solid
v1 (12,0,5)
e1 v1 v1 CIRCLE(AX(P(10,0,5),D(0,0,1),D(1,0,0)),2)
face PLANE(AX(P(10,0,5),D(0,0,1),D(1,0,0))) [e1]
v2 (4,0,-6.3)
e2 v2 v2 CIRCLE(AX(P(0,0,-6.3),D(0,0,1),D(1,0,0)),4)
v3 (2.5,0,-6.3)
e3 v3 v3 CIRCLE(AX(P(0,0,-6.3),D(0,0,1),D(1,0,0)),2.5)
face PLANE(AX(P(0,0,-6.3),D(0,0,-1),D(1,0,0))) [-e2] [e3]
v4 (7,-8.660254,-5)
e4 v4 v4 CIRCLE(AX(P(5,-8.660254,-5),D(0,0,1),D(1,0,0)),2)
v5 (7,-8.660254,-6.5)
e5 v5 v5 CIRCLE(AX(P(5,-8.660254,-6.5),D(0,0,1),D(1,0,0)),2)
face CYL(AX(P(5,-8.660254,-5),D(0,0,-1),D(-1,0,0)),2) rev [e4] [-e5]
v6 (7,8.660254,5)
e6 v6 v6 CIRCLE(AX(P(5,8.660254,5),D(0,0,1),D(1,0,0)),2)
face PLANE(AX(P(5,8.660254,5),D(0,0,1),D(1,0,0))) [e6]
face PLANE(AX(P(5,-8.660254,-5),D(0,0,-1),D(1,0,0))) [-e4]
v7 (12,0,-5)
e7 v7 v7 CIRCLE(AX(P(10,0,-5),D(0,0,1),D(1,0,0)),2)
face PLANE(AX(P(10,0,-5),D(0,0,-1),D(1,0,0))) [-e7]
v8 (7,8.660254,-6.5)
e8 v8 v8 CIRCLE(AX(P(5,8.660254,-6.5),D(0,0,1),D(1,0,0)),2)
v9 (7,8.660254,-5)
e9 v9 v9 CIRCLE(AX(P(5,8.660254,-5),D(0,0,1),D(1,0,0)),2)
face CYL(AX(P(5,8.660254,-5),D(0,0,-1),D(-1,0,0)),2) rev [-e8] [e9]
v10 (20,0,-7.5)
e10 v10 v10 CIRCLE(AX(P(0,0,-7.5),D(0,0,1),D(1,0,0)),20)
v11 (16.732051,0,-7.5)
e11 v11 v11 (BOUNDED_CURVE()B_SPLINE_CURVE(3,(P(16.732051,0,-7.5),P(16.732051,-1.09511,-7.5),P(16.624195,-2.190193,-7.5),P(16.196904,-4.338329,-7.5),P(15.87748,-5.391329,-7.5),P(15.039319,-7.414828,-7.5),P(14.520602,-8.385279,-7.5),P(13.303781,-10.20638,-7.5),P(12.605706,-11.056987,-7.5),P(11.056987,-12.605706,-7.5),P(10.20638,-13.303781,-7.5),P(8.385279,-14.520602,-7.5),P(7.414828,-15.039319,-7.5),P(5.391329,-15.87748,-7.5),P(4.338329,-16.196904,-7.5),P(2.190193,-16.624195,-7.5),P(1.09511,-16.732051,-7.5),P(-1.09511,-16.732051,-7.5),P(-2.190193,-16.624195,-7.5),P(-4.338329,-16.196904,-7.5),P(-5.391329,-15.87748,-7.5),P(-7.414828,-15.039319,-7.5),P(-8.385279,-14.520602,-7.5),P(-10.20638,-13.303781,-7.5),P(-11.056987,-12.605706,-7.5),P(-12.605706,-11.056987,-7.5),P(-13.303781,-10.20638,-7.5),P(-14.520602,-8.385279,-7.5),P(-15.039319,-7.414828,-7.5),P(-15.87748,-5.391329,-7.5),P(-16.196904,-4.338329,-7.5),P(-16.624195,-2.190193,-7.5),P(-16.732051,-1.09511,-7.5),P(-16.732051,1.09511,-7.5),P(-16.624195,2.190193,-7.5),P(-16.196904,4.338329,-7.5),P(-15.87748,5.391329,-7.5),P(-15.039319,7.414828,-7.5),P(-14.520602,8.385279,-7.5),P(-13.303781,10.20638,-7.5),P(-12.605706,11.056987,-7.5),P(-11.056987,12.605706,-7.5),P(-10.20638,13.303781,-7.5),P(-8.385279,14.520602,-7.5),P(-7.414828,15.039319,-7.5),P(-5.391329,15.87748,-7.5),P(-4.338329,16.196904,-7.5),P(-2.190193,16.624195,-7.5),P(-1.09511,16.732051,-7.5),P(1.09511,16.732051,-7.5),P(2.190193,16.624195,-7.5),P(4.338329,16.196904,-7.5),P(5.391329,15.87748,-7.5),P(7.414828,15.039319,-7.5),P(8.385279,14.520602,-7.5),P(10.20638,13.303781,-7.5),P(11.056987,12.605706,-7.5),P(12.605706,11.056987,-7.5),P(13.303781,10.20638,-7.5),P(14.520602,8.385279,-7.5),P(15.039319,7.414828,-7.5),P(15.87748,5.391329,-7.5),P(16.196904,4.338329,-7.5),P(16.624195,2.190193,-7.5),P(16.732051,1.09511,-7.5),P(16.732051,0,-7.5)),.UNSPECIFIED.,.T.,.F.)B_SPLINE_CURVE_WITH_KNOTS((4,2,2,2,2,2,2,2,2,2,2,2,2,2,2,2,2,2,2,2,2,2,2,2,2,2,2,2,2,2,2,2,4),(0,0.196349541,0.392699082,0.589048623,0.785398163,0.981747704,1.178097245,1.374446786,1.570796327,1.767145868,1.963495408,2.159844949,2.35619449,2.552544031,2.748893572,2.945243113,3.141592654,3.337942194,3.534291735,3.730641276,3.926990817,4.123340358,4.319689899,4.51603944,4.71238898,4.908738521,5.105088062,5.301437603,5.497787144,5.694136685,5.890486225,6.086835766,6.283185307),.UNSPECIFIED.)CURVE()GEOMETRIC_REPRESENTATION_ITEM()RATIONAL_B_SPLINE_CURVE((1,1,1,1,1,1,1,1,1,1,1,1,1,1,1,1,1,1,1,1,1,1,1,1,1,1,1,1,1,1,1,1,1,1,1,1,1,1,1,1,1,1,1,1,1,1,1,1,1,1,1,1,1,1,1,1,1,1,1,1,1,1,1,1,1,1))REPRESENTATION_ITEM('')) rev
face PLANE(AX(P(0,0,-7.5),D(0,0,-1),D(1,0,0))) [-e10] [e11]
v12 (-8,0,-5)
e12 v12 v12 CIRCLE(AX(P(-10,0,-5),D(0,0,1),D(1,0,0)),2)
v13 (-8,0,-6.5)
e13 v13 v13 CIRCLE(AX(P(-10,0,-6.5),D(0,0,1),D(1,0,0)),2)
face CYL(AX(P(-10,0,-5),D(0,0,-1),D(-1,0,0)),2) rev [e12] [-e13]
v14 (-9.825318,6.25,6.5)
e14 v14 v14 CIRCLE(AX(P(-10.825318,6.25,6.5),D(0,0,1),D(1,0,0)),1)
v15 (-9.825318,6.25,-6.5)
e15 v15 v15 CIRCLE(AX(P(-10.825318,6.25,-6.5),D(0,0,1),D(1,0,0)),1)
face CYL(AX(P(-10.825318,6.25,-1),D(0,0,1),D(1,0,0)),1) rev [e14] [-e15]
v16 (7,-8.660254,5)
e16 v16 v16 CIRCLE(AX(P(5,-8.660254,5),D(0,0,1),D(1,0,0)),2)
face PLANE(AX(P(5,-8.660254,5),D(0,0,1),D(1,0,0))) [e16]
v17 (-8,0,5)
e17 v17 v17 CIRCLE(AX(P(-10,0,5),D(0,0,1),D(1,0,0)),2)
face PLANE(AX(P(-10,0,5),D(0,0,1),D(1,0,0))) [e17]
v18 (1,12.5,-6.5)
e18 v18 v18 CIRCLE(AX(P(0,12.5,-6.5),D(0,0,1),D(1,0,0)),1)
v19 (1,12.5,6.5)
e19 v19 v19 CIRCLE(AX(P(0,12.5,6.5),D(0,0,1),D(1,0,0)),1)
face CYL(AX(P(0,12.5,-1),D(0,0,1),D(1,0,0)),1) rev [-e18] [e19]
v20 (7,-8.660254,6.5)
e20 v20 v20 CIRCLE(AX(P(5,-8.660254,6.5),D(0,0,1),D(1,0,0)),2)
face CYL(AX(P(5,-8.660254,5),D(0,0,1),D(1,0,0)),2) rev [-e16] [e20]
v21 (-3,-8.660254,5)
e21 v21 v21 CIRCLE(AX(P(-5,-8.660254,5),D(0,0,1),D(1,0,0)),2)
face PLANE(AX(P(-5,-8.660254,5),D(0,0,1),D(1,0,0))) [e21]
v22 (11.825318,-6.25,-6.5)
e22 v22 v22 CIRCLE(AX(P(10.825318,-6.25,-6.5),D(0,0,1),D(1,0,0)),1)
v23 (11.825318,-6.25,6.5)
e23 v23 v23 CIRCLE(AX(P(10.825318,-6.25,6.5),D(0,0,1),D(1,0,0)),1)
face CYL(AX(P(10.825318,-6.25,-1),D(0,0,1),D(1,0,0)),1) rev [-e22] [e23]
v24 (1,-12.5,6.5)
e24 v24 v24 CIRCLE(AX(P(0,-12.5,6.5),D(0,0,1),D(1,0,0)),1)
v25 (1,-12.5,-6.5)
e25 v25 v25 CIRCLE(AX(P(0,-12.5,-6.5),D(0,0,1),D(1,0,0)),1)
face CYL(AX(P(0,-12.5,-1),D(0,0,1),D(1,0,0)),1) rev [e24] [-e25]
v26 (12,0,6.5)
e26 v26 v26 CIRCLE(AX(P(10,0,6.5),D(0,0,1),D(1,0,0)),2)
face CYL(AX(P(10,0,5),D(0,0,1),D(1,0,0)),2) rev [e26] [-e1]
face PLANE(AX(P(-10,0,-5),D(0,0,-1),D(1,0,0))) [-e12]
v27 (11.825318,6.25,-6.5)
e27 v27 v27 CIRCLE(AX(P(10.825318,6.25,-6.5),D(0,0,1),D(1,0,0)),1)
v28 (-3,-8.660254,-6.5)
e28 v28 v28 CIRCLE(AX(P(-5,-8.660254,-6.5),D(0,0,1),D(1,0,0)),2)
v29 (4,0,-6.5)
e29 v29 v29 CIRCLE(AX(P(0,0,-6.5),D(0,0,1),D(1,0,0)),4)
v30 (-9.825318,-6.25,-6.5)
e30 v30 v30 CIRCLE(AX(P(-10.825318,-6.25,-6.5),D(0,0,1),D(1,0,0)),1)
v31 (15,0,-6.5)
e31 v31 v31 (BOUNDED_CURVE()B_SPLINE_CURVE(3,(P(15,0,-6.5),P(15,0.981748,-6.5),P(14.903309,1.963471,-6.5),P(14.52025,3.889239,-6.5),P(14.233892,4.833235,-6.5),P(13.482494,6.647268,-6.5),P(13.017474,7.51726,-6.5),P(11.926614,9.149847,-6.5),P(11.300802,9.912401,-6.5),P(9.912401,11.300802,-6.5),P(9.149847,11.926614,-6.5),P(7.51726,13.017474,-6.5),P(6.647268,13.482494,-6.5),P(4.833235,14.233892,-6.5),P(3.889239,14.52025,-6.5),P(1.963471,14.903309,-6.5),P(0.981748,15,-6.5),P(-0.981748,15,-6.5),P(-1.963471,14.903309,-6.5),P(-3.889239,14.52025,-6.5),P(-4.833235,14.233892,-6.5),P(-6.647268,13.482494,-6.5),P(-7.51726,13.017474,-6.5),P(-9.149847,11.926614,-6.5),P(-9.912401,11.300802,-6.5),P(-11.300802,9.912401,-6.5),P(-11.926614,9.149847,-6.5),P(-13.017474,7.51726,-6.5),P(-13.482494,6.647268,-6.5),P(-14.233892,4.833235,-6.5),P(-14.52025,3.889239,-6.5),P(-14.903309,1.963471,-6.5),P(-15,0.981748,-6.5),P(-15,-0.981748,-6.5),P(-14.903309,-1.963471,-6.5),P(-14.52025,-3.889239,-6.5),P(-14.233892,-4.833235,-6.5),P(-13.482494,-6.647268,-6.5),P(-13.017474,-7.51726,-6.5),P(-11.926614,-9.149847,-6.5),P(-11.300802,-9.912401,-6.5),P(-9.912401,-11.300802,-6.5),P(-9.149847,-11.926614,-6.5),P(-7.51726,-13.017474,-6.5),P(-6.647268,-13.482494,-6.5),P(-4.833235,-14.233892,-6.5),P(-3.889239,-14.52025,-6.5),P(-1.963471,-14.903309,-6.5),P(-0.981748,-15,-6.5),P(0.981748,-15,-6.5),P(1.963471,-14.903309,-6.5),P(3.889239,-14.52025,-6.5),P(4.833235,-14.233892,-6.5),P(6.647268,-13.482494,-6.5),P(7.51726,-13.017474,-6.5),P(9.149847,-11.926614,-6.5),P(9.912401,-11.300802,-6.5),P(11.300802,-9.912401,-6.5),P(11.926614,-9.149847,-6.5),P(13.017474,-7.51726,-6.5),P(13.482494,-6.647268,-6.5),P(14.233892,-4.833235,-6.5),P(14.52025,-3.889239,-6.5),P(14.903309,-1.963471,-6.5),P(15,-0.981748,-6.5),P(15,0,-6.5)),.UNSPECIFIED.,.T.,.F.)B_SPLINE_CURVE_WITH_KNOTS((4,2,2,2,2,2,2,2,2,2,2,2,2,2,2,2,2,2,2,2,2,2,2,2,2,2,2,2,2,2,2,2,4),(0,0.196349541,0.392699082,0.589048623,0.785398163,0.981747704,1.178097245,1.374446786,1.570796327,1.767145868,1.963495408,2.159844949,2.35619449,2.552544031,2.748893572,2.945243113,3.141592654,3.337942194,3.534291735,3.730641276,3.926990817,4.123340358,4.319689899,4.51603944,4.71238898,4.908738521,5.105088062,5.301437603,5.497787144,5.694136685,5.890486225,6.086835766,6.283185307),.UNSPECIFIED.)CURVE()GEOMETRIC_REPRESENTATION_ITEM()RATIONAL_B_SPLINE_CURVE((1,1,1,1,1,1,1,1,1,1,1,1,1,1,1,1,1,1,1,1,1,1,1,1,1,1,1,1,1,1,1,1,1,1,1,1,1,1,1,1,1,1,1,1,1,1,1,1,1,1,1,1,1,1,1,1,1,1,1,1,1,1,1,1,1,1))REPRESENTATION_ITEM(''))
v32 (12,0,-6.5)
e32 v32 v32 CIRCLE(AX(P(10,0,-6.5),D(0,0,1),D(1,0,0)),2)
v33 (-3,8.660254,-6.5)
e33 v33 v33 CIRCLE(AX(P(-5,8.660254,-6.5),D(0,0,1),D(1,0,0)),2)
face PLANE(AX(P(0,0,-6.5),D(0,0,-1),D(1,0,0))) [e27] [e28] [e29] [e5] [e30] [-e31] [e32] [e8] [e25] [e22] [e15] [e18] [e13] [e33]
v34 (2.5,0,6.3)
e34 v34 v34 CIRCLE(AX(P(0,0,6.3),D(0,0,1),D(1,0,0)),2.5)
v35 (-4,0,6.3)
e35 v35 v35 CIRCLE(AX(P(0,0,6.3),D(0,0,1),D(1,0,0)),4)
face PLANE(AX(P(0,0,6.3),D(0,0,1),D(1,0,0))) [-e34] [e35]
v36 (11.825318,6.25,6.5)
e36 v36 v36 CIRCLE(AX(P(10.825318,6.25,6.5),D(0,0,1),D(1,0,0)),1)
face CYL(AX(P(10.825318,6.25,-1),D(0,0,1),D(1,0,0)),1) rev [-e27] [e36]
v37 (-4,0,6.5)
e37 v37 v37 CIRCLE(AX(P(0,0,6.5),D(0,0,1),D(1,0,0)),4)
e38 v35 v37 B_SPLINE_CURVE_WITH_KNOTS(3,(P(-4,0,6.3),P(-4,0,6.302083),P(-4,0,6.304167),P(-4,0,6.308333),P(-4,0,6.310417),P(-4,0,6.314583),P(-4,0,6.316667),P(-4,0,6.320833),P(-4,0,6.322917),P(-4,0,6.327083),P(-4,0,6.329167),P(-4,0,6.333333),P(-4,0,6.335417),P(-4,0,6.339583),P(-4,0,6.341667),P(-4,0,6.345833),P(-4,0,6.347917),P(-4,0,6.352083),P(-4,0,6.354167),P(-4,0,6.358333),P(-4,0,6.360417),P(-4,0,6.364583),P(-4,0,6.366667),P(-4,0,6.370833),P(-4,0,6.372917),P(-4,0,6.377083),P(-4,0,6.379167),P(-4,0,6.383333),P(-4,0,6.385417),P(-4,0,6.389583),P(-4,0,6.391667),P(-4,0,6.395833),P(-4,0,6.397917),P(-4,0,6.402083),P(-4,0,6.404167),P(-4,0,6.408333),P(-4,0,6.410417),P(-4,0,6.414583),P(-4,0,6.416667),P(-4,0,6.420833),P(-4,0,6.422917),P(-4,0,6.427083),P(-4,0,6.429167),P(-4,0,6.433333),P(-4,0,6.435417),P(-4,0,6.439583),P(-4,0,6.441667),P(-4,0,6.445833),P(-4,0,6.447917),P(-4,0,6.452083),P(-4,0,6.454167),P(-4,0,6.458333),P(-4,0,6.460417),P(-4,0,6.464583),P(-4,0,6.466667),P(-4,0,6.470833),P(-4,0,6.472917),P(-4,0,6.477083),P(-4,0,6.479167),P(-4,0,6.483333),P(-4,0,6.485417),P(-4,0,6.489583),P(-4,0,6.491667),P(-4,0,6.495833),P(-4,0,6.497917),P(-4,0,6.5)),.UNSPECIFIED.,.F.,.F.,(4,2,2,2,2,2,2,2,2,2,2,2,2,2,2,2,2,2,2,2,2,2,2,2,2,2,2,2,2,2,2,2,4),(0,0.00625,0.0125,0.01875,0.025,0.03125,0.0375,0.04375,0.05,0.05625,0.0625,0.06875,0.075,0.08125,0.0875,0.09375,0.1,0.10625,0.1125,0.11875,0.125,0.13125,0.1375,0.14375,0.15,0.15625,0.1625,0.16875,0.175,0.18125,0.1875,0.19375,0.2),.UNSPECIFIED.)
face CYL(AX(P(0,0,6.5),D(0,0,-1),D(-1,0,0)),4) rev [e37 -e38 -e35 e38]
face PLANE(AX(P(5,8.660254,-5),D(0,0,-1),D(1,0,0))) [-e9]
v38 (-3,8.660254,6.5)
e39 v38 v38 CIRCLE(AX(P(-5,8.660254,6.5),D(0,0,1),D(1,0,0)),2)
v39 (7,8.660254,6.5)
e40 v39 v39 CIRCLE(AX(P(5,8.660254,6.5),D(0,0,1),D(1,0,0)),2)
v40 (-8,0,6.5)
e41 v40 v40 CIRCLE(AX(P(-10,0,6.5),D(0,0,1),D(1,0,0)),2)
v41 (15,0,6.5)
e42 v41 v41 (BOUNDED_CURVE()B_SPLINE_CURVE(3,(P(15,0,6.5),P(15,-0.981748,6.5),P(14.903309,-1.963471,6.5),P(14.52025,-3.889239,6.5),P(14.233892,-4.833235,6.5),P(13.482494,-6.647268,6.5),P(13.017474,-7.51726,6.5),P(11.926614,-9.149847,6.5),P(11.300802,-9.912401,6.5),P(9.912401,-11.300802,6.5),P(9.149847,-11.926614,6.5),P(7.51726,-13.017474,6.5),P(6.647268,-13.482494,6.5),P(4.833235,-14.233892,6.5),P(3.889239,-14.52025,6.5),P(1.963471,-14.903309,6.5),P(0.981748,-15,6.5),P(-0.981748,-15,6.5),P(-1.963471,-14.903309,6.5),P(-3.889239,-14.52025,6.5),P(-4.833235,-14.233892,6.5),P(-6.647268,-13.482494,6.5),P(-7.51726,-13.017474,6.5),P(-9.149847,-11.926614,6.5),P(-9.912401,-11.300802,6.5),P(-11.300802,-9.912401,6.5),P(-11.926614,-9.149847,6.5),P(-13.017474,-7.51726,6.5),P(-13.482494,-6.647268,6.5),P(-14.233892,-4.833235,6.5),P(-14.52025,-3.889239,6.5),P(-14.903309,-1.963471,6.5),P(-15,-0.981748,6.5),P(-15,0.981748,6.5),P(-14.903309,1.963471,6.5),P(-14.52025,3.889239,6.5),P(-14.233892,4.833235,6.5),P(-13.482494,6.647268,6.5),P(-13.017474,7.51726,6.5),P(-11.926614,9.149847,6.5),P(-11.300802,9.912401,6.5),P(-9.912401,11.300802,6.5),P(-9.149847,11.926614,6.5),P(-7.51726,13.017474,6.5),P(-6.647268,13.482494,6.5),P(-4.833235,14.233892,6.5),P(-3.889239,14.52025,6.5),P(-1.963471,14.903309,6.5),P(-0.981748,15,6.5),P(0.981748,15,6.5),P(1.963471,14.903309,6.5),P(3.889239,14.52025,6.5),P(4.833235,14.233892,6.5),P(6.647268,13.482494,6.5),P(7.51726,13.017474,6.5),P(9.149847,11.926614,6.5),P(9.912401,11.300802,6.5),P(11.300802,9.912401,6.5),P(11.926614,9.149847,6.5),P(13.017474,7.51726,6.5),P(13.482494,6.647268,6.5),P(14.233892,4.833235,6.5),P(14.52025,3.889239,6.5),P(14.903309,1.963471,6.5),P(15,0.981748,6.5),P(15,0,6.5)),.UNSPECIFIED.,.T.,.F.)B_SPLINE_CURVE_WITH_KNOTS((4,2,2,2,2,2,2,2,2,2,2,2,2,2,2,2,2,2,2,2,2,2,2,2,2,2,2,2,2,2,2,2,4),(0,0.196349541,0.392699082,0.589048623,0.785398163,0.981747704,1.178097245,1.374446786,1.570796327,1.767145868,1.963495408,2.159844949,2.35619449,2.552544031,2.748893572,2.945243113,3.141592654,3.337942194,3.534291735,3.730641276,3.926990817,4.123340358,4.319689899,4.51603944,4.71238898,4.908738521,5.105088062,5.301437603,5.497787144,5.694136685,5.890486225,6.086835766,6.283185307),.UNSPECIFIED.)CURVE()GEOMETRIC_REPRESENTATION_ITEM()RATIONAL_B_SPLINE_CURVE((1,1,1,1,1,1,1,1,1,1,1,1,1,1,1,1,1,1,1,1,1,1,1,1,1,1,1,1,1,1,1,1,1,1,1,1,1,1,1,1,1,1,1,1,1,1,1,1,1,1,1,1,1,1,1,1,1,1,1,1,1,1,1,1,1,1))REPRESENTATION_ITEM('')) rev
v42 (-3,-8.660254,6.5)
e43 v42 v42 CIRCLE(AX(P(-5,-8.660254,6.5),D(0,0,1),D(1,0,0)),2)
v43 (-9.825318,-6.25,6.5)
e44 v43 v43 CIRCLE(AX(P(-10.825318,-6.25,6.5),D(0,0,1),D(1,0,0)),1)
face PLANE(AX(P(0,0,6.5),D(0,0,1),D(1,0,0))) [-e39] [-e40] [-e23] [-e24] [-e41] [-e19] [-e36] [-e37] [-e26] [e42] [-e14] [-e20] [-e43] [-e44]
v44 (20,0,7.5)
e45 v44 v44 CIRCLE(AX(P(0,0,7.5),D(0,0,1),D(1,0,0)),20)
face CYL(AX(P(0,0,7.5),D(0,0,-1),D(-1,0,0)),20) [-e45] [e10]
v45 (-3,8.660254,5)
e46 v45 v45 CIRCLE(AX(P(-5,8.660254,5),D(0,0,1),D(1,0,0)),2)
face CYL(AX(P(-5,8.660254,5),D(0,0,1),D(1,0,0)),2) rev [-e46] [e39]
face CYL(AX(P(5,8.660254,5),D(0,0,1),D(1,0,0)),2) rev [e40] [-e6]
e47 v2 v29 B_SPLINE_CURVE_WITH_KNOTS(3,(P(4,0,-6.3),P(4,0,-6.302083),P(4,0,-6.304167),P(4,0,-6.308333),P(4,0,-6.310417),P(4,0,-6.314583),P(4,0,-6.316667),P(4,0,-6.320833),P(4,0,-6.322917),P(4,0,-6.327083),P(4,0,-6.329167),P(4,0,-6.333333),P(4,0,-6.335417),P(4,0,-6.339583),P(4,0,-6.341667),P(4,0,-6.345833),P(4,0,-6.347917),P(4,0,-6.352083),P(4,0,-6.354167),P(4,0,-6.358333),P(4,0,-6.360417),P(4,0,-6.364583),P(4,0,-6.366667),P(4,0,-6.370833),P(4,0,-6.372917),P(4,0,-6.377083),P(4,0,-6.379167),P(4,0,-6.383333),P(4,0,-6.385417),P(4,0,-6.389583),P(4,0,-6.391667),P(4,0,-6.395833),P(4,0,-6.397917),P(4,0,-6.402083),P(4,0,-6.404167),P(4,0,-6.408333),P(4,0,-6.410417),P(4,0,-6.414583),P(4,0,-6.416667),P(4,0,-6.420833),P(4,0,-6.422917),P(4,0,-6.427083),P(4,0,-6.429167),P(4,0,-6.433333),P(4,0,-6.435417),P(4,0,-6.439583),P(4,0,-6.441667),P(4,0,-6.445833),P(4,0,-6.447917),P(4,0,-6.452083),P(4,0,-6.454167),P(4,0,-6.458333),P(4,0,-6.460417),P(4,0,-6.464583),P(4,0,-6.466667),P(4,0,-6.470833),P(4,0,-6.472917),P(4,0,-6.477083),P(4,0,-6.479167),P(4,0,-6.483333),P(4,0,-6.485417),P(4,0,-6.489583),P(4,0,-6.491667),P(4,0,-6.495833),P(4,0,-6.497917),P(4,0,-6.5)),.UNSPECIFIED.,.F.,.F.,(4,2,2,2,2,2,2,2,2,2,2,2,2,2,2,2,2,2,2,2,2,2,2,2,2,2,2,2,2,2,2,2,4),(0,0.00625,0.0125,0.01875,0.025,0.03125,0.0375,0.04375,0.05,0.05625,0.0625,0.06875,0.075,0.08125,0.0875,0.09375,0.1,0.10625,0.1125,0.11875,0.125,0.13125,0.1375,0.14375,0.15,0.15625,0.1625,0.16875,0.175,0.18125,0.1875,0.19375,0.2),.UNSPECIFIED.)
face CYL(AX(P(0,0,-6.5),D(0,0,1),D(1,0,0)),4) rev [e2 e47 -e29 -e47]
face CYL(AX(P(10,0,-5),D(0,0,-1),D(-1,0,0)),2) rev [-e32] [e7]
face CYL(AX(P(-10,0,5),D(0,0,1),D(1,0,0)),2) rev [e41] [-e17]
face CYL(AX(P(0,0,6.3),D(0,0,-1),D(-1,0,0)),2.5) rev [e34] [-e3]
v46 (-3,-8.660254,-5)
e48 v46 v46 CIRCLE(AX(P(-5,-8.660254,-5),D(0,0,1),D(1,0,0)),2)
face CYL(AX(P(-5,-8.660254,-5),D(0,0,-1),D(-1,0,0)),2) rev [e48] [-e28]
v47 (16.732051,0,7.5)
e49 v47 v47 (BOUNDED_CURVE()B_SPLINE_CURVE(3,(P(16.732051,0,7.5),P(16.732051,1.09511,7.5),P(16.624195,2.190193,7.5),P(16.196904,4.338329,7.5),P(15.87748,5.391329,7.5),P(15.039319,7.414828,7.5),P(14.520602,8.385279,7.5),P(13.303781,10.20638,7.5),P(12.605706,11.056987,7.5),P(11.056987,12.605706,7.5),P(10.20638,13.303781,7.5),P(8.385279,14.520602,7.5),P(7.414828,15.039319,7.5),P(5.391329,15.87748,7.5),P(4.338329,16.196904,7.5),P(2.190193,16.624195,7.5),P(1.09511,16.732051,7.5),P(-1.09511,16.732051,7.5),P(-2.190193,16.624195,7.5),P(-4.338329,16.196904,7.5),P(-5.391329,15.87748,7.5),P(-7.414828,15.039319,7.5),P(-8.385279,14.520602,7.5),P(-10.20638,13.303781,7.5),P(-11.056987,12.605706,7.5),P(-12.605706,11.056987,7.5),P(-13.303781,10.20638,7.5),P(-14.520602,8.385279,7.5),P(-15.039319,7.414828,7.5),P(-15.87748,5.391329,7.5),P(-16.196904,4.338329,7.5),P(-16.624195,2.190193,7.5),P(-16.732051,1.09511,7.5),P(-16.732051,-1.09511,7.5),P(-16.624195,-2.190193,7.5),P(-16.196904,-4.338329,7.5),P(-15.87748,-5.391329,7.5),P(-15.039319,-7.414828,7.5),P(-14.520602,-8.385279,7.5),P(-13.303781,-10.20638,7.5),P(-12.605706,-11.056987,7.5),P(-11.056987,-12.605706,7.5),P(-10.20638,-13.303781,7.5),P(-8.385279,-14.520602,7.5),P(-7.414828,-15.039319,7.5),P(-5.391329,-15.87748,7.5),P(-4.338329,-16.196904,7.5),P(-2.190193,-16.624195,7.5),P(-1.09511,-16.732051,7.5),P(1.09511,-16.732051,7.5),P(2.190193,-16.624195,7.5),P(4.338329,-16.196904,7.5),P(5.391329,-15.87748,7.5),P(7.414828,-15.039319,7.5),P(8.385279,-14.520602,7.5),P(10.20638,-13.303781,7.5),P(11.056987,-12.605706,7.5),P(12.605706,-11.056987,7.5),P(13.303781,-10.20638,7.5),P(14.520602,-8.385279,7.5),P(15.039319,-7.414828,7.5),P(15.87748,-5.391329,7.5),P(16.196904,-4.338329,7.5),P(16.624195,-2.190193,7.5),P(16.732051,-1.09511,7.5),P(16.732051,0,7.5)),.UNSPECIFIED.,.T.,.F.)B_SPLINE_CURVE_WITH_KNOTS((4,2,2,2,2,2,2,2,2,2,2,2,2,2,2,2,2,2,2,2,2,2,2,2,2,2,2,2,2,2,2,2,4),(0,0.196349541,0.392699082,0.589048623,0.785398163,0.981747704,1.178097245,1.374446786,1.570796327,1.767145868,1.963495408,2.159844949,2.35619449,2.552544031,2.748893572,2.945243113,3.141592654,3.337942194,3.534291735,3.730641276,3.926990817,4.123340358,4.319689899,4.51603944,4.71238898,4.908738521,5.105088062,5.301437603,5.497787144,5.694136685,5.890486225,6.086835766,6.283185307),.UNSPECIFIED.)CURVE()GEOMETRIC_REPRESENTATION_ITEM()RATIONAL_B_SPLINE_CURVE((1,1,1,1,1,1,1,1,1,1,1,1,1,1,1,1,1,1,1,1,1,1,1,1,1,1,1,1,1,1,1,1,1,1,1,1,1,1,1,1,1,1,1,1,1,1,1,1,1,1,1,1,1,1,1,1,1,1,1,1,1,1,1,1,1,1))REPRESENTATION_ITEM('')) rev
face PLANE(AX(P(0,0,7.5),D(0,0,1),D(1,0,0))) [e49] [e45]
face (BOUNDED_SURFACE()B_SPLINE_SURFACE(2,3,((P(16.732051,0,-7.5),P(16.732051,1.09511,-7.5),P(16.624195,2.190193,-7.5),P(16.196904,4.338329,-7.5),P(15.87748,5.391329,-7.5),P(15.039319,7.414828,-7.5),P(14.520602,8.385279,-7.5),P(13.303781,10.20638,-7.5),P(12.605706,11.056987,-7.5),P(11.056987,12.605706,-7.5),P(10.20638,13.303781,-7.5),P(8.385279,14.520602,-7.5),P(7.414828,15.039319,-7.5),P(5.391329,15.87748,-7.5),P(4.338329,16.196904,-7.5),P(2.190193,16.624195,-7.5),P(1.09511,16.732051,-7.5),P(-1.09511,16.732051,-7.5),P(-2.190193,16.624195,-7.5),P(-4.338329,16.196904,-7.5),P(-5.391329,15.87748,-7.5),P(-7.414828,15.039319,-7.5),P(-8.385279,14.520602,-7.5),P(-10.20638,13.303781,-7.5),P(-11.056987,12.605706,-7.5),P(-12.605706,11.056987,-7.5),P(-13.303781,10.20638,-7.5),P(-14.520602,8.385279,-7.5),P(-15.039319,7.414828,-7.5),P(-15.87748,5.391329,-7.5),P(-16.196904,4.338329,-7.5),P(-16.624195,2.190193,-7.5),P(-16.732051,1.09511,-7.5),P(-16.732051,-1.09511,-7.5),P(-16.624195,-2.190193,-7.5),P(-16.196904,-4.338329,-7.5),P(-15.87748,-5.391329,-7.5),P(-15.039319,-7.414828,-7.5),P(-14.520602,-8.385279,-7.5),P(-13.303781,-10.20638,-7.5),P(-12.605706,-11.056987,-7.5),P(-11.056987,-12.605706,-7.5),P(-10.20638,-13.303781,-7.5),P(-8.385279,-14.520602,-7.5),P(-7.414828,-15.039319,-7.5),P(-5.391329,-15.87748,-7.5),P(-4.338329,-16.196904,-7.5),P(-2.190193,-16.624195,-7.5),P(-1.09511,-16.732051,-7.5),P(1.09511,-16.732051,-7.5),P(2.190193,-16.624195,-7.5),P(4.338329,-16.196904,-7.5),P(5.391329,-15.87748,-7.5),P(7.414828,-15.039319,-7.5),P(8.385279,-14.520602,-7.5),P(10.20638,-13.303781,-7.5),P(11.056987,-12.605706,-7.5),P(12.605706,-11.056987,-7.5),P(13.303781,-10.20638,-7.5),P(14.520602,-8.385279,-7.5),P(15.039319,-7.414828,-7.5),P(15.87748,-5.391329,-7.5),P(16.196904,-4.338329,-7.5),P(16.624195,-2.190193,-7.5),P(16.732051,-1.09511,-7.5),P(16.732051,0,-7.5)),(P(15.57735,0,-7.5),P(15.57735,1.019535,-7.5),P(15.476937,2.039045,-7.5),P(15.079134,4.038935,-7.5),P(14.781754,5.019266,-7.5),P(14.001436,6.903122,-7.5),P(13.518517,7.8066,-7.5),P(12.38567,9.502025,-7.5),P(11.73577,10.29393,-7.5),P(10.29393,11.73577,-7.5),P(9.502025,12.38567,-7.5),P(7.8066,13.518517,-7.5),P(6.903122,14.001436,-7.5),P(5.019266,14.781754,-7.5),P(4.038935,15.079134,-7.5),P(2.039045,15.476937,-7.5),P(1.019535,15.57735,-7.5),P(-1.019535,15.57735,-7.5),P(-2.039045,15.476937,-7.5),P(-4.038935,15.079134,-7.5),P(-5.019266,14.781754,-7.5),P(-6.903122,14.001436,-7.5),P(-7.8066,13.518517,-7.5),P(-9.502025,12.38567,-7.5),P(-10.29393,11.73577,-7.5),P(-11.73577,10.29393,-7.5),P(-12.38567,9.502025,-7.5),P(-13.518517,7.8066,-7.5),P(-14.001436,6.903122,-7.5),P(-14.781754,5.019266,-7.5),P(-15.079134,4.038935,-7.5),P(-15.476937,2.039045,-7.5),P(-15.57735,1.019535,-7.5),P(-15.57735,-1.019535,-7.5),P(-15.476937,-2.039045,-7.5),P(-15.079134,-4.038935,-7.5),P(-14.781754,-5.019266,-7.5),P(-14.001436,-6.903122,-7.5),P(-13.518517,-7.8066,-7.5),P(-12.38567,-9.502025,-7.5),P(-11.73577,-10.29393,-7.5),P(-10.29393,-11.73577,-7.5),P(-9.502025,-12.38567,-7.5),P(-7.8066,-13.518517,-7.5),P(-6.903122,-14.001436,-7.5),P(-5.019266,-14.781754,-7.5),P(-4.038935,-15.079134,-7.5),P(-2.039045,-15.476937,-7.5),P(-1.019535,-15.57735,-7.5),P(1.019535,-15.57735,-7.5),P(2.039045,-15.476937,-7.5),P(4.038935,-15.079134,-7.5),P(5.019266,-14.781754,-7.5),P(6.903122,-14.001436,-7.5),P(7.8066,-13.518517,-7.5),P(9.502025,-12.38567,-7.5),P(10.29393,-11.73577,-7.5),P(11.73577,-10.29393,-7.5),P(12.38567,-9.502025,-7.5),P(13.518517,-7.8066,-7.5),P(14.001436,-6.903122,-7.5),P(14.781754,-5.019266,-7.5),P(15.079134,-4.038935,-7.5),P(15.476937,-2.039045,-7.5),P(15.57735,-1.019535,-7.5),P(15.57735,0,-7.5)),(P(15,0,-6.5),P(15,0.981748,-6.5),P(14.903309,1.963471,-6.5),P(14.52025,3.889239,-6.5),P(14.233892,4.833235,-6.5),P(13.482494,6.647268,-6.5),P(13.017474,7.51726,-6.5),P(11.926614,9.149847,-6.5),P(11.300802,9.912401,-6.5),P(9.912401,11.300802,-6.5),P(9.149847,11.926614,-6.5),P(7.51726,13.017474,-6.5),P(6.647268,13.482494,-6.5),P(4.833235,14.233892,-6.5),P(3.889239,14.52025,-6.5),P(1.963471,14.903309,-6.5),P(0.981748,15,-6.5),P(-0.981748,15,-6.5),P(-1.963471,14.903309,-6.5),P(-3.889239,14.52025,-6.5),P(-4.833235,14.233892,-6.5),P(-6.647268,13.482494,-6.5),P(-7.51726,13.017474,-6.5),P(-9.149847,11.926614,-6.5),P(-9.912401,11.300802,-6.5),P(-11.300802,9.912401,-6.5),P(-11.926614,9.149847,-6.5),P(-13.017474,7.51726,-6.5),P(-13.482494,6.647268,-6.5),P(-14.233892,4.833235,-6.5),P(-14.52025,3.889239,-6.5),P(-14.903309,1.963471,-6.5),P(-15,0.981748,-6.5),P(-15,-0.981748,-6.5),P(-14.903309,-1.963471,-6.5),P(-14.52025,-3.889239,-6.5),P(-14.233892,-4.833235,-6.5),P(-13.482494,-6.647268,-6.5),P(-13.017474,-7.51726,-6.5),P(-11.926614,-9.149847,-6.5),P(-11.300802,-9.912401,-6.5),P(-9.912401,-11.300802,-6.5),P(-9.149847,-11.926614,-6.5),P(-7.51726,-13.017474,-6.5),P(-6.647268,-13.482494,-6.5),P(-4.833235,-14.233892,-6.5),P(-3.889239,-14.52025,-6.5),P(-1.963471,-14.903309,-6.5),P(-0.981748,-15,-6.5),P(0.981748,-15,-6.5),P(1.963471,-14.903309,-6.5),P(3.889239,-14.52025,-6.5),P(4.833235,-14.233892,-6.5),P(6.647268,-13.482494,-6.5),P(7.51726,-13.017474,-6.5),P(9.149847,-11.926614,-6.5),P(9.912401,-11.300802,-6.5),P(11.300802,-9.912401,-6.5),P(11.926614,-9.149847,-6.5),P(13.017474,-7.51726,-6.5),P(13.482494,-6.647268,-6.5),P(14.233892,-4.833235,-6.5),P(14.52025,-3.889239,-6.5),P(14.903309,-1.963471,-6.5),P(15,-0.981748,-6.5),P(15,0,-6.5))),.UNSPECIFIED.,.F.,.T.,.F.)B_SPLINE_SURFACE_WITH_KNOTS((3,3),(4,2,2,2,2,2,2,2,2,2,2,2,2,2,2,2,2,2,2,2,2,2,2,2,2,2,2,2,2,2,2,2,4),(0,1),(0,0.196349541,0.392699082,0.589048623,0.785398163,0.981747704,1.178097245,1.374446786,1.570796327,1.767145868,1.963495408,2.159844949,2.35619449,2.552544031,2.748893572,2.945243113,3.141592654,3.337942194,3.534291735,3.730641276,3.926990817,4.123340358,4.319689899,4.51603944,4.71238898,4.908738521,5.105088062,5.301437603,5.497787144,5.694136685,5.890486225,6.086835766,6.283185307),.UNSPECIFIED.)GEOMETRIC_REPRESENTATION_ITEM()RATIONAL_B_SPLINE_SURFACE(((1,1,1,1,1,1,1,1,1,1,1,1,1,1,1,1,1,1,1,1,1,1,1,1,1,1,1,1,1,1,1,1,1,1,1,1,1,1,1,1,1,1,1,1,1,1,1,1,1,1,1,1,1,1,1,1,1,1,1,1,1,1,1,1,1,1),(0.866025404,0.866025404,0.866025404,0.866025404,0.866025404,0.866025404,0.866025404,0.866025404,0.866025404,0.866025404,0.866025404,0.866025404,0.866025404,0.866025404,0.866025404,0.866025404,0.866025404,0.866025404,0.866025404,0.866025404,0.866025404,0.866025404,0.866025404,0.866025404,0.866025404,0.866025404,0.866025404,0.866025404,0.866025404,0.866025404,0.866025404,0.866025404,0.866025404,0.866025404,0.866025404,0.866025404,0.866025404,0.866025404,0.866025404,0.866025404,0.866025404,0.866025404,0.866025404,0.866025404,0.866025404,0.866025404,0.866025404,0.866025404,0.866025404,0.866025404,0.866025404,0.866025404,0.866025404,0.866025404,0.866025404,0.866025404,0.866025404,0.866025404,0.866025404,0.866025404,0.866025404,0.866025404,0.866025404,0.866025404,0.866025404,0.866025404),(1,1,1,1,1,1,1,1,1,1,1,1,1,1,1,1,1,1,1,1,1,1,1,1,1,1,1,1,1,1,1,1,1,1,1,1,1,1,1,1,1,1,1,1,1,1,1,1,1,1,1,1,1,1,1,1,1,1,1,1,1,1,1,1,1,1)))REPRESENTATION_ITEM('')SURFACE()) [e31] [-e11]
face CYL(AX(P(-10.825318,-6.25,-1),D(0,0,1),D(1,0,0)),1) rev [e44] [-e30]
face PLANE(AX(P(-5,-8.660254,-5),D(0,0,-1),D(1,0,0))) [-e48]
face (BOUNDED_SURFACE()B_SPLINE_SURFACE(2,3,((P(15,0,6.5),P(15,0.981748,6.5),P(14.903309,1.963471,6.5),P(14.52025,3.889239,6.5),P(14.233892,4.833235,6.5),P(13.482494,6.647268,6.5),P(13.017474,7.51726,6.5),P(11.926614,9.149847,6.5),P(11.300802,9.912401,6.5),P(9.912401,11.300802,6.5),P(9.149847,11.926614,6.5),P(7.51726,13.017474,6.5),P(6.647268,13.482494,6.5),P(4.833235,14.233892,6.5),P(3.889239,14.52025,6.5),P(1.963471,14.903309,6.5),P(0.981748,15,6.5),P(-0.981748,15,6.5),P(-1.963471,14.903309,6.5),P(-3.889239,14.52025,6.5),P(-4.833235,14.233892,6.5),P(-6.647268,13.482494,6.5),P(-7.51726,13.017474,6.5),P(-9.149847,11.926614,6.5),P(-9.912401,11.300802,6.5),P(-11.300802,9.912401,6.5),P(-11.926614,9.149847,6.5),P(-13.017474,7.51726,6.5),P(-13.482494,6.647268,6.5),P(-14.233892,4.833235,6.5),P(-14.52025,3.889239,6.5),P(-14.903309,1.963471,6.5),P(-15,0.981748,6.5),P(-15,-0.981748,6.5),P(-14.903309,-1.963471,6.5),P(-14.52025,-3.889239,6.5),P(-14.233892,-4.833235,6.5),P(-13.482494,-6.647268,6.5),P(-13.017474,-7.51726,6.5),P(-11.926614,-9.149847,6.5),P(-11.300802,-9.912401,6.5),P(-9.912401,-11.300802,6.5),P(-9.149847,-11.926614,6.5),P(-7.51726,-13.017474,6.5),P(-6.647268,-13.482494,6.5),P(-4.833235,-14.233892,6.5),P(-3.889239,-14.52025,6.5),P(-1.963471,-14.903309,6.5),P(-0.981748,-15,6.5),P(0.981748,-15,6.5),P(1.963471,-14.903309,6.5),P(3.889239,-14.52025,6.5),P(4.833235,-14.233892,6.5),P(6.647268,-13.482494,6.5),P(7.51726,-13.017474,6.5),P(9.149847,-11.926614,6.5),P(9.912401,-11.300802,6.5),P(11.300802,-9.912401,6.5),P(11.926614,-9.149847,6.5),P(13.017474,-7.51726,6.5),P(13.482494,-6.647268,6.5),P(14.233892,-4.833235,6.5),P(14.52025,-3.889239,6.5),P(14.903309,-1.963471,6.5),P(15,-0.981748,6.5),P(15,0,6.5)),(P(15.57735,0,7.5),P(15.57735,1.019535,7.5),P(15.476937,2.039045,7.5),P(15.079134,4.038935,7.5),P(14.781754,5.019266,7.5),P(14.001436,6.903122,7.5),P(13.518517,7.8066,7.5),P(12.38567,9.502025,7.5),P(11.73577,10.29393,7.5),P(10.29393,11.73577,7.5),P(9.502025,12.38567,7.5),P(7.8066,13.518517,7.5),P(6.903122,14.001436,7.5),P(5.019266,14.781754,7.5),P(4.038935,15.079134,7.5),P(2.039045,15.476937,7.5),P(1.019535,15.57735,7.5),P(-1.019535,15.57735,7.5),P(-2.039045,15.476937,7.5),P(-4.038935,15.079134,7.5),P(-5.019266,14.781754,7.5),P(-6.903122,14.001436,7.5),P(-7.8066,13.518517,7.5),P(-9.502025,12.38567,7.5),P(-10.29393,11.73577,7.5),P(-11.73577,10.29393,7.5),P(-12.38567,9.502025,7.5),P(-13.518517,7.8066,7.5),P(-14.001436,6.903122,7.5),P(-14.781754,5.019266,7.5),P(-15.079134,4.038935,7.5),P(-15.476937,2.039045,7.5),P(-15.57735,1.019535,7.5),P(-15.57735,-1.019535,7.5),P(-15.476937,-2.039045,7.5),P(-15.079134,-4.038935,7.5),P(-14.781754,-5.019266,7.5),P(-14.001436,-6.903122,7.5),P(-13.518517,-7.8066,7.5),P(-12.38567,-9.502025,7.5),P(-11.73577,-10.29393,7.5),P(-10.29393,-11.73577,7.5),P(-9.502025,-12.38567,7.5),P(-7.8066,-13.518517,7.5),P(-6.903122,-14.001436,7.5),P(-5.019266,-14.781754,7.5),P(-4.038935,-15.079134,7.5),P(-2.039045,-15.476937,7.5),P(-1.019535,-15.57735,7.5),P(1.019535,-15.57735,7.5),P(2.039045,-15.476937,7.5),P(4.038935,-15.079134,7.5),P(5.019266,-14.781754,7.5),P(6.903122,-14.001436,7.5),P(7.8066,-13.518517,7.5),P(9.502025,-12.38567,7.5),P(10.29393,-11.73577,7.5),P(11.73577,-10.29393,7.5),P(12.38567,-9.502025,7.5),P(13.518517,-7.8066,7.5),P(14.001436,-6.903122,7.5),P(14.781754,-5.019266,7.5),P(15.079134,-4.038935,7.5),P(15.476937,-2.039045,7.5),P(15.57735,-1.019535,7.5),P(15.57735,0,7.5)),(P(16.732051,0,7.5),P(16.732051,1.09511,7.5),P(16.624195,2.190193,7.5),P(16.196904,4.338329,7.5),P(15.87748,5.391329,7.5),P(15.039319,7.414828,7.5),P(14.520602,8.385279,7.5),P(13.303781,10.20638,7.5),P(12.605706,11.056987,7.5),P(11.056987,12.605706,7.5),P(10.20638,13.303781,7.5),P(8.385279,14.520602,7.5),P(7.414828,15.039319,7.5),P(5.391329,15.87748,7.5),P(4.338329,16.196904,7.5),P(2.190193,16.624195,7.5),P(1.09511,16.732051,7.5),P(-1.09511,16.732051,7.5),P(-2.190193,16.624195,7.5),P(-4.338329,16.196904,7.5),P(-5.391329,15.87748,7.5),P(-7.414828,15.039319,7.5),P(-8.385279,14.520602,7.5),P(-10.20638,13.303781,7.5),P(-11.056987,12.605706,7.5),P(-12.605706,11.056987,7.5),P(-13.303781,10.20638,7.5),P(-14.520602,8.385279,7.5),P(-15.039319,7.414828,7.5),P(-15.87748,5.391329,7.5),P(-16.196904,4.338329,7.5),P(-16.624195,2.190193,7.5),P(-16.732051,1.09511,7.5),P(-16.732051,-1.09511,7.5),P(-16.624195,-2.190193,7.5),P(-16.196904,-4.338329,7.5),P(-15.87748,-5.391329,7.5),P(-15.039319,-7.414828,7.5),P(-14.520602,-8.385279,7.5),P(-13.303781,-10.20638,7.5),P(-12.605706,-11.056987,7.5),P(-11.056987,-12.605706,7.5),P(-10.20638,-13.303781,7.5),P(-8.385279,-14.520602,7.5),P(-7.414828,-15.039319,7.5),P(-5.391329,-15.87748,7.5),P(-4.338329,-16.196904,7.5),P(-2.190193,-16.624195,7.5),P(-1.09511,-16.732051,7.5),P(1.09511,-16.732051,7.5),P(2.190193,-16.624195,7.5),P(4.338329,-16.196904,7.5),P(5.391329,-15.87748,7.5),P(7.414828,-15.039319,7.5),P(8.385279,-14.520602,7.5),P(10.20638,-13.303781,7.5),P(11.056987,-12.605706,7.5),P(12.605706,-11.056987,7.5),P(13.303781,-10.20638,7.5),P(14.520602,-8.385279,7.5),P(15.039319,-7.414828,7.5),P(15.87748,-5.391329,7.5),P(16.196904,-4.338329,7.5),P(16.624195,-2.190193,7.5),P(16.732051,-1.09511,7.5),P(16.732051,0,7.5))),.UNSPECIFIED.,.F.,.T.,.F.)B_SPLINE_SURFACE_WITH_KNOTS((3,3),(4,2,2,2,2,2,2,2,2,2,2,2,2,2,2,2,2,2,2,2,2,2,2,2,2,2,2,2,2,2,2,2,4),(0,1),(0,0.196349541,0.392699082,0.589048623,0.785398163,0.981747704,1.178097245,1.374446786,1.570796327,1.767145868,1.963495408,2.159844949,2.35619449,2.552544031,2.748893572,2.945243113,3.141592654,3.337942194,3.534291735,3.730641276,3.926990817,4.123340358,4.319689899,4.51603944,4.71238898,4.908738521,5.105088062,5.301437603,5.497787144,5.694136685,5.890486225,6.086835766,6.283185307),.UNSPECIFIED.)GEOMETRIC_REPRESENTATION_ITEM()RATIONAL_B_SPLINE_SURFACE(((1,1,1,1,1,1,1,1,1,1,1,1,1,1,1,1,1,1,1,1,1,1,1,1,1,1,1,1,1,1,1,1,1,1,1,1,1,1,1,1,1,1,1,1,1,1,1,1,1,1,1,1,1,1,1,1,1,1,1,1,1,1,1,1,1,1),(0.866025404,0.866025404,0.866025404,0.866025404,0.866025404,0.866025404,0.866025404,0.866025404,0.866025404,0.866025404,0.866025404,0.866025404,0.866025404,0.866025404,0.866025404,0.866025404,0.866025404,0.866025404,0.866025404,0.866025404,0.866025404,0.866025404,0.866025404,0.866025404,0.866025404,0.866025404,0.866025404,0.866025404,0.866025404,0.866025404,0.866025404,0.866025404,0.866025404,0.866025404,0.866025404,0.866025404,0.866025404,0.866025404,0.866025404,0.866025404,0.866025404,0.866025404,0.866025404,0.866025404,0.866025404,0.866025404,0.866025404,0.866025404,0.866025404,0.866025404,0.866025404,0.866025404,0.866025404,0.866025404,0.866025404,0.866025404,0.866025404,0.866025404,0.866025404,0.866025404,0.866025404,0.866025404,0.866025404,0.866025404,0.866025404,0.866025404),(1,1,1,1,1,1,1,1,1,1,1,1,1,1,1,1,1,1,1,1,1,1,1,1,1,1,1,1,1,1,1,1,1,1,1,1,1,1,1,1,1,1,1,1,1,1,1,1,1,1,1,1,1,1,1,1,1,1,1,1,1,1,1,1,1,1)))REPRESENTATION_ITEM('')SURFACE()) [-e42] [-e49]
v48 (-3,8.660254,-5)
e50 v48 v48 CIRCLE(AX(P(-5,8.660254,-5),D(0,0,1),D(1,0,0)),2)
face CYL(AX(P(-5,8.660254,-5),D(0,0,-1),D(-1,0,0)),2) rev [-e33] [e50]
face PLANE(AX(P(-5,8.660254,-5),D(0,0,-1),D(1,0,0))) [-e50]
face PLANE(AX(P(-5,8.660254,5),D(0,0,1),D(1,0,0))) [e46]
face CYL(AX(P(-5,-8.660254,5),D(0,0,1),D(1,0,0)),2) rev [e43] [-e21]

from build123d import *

# Parameters (mm, degrees)
ESQUISSE1_R             = 20
ESQUISSE1_R_2           = 17
ESQUISSE1_R_3           = 15
BOSS_EXTRU_1_DEPTH      = 7.5
ESQUISSE1_3_R           = 15
ESQUISSE1_3_R_2         = 4
BOSS_EXTRU_2_DEPTH      = 6.5
ESQUISSE1_6_R           = 4
ESQUISSE1_6_R_2         = 2.5
BOSS_EXTRU_3_DEPTH      = 6.3
CONG_1_R                = 2
ESQUISSE4_R             = 2
ENL_V_MAT_EXTRU_1_DEPTH = 1.5
ESQUISSE3_R             = 1
ENL_V_MAT_EXTRU_2_DEPTH = 7.5
CONG_1_OF_SYM_TRIE1_R   = 2


with BuildPart() as part:
    # Esquisse1 → Boss.-Extru.1 (new body)
    # profile 1 of 2: a face of its own
    with BuildSketch(Plane.XY):
        Circle(ESQUISSE1_R)
        Circle(ESQUISSE1_R_2, mode=Mode.SUBTRACT)
    # profile 2 of 2: a face of its own
    with BuildSketch(Plane.XY):
        Circle(ESQUISSE1_R_2)
        Circle(ESQUISSE1_R_3, mode=Mode.SUBTRACT)
    boss_extru_1 = extrude(amount=BOSS_EXTRU_1_DEPTH)

    # Esquisse1<3> → Boss.-Extru.2 (add)
    with BuildSketch(Plane.XY):
        Circle(ESQUISSE1_3_R)
        with Locations(Location((0, 0, 0), (0, 0, 180))):
            Circle(ESQUISSE1_3_R_2, mode=Mode.SUBTRACT)
    boss_extru_2 = extrude(amount=BOSS_EXTRU_2_DEPTH)

    # Esquisse1<6> → Boss.-Extru.3 (add)
    with BuildSketch(Plane.XY):
        with Locations(Location((0, 0, 0), (0, 0, 180))):
            Circle(ESQUISSE1_6_R)
        Circle(ESQUISSE1_6_R_2, mode=Mode.SUBTRACT)
    boss_extru_3 = extrude(amount=BOSS_EXTRU_3_DEPTH)

    # Congé1
    # the kernel refuses this fillet: 2 mm, written as the material it takes off along each edge
    with BuildSketch(Plane(origin=(0, 0, 7.5), x_dir=(1, 0, 0), z_dir=(0, -1, 0))) as cong_1_piece_1:
        with BuildLine():
            CenterArc((16.732050808, -2), CONG_1_R, 90, 60)
            Line((15, -1), (14.965358984, -0.98))
            ThreePointArc((14.965358984, -0.98), (14.96, -0.5), (14.96, 0))
            Line((14.96, 0), (15, 0.04))
            Line((15, 0.04), (16.732050808, 0.04))
            Line((16.732050808, 0.04), (16.732050808, 0))
        make_face()
    revolve(axis=Axis((0, 0, 7.5), (0, 0, 1)), mode=Mode.SUBTRACT)

    # Esquisse4 → Enlèv. mat.-Extru.1 (cut)
    with BuildSketch(Plane.XY.offset(6.5)):
        with Locations((-10, 0)):
            Circle(ESQUISSE4_R)
        with Locations((-5, 8.660254038)):
            Circle(ESQUISSE4_R)
        with Locations((5, 8.660254038)):
            Circle(ESQUISSE4_R)
        with Locations((10, 0)):
            Circle(ESQUISSE4_R)
        with Locations((5, -8.660254038)):
            Circle(ESQUISSE4_R)
        with Locations((-5, -8.660254038)):
            Circle(ESQUISSE4_R)
    enl_v_mat_extru_1 = extrude(amount=-ENL_V_MAT_EXTRU_1_DEPTH, mode=Mode.SUBTRACT)

    # Esquisse3 → Enlèv. mat.-Extru.2 (cut)
    with BuildSketch(Plane.XY.offset(6.5)):
        with Locations((0, 12.5)):
            Circle(ESQUISSE3_R)
        with Locations((-10.825317547, 6.25)):
            Circle(ESQUISSE3_R)
        with Locations((-10.825317547, -6.25)):
            Circle(ESQUISSE3_R)
        with Locations((0, -12.5)):
            Circle(ESQUISSE3_R)
        with Locations((10.825317547, -6.25)):
            Circle(ESQUISSE3_R)
        with Locations((10.825317547, 6.25)):
            Circle(ESQUISSE3_R)
    enl_v_mat_extru_2 = extrude(amount=-ENL_V_MAT_EXTRU_2_DEPTH, mode=Mode.SUBTRACT)

    # Symétrie1: Boss.-Extru.1, Boss.-Extru.2, Boss.-Extru.3, Enlèv. mat.-Extru.1, Enlèv. mat.-Extru.2 across plane
    add(boss_extru_1.mirror(Plane.XY))
    add(boss_extru_2.mirror(Plane.XY))
    add(boss_extru_3.mirror(Plane.XY))
    add(enl_v_mat_extru_1.mirror(Plane.XY), mode=Mode.SUBTRACT)
    add(enl_v_mat_extru_2.mirror(Plane.XY), mode=Mode.SUBTRACT)

    # Congé1 of Symétrie1
    # the kernel refuses this fillet: 2 mm, written as the material it takes off along each edge
    with BuildSketch(Plane(origin=(0, 0, -7.5), x_dir=(1, 0, 0), z_dir=(0, -1, 0))) as cong_1_of_sym_trie1_piece_1:
        with BuildLine():
            CenterArc((16.732050808, 2), CONG_1_OF_SYM_TRIE1_R, 210, 60)
            Line((15, 1), (14.965358984, 0.98))
            ThreePointArc((14.965358984, 0.98), (14.96, 0.5), (14.96, 0))
            Line((14.96, 0), (15, -0.04))
            Line((15, -0.04), (16.732050808, -0.04))
            Line((16.732050808, -0.04), (16.732050808, 0))
        make_face()
    revolve(axis=Axis((0, 0, -7.5), (0, 0, 1)), mode=Mode.SUBTRACT)


solid = part.part
